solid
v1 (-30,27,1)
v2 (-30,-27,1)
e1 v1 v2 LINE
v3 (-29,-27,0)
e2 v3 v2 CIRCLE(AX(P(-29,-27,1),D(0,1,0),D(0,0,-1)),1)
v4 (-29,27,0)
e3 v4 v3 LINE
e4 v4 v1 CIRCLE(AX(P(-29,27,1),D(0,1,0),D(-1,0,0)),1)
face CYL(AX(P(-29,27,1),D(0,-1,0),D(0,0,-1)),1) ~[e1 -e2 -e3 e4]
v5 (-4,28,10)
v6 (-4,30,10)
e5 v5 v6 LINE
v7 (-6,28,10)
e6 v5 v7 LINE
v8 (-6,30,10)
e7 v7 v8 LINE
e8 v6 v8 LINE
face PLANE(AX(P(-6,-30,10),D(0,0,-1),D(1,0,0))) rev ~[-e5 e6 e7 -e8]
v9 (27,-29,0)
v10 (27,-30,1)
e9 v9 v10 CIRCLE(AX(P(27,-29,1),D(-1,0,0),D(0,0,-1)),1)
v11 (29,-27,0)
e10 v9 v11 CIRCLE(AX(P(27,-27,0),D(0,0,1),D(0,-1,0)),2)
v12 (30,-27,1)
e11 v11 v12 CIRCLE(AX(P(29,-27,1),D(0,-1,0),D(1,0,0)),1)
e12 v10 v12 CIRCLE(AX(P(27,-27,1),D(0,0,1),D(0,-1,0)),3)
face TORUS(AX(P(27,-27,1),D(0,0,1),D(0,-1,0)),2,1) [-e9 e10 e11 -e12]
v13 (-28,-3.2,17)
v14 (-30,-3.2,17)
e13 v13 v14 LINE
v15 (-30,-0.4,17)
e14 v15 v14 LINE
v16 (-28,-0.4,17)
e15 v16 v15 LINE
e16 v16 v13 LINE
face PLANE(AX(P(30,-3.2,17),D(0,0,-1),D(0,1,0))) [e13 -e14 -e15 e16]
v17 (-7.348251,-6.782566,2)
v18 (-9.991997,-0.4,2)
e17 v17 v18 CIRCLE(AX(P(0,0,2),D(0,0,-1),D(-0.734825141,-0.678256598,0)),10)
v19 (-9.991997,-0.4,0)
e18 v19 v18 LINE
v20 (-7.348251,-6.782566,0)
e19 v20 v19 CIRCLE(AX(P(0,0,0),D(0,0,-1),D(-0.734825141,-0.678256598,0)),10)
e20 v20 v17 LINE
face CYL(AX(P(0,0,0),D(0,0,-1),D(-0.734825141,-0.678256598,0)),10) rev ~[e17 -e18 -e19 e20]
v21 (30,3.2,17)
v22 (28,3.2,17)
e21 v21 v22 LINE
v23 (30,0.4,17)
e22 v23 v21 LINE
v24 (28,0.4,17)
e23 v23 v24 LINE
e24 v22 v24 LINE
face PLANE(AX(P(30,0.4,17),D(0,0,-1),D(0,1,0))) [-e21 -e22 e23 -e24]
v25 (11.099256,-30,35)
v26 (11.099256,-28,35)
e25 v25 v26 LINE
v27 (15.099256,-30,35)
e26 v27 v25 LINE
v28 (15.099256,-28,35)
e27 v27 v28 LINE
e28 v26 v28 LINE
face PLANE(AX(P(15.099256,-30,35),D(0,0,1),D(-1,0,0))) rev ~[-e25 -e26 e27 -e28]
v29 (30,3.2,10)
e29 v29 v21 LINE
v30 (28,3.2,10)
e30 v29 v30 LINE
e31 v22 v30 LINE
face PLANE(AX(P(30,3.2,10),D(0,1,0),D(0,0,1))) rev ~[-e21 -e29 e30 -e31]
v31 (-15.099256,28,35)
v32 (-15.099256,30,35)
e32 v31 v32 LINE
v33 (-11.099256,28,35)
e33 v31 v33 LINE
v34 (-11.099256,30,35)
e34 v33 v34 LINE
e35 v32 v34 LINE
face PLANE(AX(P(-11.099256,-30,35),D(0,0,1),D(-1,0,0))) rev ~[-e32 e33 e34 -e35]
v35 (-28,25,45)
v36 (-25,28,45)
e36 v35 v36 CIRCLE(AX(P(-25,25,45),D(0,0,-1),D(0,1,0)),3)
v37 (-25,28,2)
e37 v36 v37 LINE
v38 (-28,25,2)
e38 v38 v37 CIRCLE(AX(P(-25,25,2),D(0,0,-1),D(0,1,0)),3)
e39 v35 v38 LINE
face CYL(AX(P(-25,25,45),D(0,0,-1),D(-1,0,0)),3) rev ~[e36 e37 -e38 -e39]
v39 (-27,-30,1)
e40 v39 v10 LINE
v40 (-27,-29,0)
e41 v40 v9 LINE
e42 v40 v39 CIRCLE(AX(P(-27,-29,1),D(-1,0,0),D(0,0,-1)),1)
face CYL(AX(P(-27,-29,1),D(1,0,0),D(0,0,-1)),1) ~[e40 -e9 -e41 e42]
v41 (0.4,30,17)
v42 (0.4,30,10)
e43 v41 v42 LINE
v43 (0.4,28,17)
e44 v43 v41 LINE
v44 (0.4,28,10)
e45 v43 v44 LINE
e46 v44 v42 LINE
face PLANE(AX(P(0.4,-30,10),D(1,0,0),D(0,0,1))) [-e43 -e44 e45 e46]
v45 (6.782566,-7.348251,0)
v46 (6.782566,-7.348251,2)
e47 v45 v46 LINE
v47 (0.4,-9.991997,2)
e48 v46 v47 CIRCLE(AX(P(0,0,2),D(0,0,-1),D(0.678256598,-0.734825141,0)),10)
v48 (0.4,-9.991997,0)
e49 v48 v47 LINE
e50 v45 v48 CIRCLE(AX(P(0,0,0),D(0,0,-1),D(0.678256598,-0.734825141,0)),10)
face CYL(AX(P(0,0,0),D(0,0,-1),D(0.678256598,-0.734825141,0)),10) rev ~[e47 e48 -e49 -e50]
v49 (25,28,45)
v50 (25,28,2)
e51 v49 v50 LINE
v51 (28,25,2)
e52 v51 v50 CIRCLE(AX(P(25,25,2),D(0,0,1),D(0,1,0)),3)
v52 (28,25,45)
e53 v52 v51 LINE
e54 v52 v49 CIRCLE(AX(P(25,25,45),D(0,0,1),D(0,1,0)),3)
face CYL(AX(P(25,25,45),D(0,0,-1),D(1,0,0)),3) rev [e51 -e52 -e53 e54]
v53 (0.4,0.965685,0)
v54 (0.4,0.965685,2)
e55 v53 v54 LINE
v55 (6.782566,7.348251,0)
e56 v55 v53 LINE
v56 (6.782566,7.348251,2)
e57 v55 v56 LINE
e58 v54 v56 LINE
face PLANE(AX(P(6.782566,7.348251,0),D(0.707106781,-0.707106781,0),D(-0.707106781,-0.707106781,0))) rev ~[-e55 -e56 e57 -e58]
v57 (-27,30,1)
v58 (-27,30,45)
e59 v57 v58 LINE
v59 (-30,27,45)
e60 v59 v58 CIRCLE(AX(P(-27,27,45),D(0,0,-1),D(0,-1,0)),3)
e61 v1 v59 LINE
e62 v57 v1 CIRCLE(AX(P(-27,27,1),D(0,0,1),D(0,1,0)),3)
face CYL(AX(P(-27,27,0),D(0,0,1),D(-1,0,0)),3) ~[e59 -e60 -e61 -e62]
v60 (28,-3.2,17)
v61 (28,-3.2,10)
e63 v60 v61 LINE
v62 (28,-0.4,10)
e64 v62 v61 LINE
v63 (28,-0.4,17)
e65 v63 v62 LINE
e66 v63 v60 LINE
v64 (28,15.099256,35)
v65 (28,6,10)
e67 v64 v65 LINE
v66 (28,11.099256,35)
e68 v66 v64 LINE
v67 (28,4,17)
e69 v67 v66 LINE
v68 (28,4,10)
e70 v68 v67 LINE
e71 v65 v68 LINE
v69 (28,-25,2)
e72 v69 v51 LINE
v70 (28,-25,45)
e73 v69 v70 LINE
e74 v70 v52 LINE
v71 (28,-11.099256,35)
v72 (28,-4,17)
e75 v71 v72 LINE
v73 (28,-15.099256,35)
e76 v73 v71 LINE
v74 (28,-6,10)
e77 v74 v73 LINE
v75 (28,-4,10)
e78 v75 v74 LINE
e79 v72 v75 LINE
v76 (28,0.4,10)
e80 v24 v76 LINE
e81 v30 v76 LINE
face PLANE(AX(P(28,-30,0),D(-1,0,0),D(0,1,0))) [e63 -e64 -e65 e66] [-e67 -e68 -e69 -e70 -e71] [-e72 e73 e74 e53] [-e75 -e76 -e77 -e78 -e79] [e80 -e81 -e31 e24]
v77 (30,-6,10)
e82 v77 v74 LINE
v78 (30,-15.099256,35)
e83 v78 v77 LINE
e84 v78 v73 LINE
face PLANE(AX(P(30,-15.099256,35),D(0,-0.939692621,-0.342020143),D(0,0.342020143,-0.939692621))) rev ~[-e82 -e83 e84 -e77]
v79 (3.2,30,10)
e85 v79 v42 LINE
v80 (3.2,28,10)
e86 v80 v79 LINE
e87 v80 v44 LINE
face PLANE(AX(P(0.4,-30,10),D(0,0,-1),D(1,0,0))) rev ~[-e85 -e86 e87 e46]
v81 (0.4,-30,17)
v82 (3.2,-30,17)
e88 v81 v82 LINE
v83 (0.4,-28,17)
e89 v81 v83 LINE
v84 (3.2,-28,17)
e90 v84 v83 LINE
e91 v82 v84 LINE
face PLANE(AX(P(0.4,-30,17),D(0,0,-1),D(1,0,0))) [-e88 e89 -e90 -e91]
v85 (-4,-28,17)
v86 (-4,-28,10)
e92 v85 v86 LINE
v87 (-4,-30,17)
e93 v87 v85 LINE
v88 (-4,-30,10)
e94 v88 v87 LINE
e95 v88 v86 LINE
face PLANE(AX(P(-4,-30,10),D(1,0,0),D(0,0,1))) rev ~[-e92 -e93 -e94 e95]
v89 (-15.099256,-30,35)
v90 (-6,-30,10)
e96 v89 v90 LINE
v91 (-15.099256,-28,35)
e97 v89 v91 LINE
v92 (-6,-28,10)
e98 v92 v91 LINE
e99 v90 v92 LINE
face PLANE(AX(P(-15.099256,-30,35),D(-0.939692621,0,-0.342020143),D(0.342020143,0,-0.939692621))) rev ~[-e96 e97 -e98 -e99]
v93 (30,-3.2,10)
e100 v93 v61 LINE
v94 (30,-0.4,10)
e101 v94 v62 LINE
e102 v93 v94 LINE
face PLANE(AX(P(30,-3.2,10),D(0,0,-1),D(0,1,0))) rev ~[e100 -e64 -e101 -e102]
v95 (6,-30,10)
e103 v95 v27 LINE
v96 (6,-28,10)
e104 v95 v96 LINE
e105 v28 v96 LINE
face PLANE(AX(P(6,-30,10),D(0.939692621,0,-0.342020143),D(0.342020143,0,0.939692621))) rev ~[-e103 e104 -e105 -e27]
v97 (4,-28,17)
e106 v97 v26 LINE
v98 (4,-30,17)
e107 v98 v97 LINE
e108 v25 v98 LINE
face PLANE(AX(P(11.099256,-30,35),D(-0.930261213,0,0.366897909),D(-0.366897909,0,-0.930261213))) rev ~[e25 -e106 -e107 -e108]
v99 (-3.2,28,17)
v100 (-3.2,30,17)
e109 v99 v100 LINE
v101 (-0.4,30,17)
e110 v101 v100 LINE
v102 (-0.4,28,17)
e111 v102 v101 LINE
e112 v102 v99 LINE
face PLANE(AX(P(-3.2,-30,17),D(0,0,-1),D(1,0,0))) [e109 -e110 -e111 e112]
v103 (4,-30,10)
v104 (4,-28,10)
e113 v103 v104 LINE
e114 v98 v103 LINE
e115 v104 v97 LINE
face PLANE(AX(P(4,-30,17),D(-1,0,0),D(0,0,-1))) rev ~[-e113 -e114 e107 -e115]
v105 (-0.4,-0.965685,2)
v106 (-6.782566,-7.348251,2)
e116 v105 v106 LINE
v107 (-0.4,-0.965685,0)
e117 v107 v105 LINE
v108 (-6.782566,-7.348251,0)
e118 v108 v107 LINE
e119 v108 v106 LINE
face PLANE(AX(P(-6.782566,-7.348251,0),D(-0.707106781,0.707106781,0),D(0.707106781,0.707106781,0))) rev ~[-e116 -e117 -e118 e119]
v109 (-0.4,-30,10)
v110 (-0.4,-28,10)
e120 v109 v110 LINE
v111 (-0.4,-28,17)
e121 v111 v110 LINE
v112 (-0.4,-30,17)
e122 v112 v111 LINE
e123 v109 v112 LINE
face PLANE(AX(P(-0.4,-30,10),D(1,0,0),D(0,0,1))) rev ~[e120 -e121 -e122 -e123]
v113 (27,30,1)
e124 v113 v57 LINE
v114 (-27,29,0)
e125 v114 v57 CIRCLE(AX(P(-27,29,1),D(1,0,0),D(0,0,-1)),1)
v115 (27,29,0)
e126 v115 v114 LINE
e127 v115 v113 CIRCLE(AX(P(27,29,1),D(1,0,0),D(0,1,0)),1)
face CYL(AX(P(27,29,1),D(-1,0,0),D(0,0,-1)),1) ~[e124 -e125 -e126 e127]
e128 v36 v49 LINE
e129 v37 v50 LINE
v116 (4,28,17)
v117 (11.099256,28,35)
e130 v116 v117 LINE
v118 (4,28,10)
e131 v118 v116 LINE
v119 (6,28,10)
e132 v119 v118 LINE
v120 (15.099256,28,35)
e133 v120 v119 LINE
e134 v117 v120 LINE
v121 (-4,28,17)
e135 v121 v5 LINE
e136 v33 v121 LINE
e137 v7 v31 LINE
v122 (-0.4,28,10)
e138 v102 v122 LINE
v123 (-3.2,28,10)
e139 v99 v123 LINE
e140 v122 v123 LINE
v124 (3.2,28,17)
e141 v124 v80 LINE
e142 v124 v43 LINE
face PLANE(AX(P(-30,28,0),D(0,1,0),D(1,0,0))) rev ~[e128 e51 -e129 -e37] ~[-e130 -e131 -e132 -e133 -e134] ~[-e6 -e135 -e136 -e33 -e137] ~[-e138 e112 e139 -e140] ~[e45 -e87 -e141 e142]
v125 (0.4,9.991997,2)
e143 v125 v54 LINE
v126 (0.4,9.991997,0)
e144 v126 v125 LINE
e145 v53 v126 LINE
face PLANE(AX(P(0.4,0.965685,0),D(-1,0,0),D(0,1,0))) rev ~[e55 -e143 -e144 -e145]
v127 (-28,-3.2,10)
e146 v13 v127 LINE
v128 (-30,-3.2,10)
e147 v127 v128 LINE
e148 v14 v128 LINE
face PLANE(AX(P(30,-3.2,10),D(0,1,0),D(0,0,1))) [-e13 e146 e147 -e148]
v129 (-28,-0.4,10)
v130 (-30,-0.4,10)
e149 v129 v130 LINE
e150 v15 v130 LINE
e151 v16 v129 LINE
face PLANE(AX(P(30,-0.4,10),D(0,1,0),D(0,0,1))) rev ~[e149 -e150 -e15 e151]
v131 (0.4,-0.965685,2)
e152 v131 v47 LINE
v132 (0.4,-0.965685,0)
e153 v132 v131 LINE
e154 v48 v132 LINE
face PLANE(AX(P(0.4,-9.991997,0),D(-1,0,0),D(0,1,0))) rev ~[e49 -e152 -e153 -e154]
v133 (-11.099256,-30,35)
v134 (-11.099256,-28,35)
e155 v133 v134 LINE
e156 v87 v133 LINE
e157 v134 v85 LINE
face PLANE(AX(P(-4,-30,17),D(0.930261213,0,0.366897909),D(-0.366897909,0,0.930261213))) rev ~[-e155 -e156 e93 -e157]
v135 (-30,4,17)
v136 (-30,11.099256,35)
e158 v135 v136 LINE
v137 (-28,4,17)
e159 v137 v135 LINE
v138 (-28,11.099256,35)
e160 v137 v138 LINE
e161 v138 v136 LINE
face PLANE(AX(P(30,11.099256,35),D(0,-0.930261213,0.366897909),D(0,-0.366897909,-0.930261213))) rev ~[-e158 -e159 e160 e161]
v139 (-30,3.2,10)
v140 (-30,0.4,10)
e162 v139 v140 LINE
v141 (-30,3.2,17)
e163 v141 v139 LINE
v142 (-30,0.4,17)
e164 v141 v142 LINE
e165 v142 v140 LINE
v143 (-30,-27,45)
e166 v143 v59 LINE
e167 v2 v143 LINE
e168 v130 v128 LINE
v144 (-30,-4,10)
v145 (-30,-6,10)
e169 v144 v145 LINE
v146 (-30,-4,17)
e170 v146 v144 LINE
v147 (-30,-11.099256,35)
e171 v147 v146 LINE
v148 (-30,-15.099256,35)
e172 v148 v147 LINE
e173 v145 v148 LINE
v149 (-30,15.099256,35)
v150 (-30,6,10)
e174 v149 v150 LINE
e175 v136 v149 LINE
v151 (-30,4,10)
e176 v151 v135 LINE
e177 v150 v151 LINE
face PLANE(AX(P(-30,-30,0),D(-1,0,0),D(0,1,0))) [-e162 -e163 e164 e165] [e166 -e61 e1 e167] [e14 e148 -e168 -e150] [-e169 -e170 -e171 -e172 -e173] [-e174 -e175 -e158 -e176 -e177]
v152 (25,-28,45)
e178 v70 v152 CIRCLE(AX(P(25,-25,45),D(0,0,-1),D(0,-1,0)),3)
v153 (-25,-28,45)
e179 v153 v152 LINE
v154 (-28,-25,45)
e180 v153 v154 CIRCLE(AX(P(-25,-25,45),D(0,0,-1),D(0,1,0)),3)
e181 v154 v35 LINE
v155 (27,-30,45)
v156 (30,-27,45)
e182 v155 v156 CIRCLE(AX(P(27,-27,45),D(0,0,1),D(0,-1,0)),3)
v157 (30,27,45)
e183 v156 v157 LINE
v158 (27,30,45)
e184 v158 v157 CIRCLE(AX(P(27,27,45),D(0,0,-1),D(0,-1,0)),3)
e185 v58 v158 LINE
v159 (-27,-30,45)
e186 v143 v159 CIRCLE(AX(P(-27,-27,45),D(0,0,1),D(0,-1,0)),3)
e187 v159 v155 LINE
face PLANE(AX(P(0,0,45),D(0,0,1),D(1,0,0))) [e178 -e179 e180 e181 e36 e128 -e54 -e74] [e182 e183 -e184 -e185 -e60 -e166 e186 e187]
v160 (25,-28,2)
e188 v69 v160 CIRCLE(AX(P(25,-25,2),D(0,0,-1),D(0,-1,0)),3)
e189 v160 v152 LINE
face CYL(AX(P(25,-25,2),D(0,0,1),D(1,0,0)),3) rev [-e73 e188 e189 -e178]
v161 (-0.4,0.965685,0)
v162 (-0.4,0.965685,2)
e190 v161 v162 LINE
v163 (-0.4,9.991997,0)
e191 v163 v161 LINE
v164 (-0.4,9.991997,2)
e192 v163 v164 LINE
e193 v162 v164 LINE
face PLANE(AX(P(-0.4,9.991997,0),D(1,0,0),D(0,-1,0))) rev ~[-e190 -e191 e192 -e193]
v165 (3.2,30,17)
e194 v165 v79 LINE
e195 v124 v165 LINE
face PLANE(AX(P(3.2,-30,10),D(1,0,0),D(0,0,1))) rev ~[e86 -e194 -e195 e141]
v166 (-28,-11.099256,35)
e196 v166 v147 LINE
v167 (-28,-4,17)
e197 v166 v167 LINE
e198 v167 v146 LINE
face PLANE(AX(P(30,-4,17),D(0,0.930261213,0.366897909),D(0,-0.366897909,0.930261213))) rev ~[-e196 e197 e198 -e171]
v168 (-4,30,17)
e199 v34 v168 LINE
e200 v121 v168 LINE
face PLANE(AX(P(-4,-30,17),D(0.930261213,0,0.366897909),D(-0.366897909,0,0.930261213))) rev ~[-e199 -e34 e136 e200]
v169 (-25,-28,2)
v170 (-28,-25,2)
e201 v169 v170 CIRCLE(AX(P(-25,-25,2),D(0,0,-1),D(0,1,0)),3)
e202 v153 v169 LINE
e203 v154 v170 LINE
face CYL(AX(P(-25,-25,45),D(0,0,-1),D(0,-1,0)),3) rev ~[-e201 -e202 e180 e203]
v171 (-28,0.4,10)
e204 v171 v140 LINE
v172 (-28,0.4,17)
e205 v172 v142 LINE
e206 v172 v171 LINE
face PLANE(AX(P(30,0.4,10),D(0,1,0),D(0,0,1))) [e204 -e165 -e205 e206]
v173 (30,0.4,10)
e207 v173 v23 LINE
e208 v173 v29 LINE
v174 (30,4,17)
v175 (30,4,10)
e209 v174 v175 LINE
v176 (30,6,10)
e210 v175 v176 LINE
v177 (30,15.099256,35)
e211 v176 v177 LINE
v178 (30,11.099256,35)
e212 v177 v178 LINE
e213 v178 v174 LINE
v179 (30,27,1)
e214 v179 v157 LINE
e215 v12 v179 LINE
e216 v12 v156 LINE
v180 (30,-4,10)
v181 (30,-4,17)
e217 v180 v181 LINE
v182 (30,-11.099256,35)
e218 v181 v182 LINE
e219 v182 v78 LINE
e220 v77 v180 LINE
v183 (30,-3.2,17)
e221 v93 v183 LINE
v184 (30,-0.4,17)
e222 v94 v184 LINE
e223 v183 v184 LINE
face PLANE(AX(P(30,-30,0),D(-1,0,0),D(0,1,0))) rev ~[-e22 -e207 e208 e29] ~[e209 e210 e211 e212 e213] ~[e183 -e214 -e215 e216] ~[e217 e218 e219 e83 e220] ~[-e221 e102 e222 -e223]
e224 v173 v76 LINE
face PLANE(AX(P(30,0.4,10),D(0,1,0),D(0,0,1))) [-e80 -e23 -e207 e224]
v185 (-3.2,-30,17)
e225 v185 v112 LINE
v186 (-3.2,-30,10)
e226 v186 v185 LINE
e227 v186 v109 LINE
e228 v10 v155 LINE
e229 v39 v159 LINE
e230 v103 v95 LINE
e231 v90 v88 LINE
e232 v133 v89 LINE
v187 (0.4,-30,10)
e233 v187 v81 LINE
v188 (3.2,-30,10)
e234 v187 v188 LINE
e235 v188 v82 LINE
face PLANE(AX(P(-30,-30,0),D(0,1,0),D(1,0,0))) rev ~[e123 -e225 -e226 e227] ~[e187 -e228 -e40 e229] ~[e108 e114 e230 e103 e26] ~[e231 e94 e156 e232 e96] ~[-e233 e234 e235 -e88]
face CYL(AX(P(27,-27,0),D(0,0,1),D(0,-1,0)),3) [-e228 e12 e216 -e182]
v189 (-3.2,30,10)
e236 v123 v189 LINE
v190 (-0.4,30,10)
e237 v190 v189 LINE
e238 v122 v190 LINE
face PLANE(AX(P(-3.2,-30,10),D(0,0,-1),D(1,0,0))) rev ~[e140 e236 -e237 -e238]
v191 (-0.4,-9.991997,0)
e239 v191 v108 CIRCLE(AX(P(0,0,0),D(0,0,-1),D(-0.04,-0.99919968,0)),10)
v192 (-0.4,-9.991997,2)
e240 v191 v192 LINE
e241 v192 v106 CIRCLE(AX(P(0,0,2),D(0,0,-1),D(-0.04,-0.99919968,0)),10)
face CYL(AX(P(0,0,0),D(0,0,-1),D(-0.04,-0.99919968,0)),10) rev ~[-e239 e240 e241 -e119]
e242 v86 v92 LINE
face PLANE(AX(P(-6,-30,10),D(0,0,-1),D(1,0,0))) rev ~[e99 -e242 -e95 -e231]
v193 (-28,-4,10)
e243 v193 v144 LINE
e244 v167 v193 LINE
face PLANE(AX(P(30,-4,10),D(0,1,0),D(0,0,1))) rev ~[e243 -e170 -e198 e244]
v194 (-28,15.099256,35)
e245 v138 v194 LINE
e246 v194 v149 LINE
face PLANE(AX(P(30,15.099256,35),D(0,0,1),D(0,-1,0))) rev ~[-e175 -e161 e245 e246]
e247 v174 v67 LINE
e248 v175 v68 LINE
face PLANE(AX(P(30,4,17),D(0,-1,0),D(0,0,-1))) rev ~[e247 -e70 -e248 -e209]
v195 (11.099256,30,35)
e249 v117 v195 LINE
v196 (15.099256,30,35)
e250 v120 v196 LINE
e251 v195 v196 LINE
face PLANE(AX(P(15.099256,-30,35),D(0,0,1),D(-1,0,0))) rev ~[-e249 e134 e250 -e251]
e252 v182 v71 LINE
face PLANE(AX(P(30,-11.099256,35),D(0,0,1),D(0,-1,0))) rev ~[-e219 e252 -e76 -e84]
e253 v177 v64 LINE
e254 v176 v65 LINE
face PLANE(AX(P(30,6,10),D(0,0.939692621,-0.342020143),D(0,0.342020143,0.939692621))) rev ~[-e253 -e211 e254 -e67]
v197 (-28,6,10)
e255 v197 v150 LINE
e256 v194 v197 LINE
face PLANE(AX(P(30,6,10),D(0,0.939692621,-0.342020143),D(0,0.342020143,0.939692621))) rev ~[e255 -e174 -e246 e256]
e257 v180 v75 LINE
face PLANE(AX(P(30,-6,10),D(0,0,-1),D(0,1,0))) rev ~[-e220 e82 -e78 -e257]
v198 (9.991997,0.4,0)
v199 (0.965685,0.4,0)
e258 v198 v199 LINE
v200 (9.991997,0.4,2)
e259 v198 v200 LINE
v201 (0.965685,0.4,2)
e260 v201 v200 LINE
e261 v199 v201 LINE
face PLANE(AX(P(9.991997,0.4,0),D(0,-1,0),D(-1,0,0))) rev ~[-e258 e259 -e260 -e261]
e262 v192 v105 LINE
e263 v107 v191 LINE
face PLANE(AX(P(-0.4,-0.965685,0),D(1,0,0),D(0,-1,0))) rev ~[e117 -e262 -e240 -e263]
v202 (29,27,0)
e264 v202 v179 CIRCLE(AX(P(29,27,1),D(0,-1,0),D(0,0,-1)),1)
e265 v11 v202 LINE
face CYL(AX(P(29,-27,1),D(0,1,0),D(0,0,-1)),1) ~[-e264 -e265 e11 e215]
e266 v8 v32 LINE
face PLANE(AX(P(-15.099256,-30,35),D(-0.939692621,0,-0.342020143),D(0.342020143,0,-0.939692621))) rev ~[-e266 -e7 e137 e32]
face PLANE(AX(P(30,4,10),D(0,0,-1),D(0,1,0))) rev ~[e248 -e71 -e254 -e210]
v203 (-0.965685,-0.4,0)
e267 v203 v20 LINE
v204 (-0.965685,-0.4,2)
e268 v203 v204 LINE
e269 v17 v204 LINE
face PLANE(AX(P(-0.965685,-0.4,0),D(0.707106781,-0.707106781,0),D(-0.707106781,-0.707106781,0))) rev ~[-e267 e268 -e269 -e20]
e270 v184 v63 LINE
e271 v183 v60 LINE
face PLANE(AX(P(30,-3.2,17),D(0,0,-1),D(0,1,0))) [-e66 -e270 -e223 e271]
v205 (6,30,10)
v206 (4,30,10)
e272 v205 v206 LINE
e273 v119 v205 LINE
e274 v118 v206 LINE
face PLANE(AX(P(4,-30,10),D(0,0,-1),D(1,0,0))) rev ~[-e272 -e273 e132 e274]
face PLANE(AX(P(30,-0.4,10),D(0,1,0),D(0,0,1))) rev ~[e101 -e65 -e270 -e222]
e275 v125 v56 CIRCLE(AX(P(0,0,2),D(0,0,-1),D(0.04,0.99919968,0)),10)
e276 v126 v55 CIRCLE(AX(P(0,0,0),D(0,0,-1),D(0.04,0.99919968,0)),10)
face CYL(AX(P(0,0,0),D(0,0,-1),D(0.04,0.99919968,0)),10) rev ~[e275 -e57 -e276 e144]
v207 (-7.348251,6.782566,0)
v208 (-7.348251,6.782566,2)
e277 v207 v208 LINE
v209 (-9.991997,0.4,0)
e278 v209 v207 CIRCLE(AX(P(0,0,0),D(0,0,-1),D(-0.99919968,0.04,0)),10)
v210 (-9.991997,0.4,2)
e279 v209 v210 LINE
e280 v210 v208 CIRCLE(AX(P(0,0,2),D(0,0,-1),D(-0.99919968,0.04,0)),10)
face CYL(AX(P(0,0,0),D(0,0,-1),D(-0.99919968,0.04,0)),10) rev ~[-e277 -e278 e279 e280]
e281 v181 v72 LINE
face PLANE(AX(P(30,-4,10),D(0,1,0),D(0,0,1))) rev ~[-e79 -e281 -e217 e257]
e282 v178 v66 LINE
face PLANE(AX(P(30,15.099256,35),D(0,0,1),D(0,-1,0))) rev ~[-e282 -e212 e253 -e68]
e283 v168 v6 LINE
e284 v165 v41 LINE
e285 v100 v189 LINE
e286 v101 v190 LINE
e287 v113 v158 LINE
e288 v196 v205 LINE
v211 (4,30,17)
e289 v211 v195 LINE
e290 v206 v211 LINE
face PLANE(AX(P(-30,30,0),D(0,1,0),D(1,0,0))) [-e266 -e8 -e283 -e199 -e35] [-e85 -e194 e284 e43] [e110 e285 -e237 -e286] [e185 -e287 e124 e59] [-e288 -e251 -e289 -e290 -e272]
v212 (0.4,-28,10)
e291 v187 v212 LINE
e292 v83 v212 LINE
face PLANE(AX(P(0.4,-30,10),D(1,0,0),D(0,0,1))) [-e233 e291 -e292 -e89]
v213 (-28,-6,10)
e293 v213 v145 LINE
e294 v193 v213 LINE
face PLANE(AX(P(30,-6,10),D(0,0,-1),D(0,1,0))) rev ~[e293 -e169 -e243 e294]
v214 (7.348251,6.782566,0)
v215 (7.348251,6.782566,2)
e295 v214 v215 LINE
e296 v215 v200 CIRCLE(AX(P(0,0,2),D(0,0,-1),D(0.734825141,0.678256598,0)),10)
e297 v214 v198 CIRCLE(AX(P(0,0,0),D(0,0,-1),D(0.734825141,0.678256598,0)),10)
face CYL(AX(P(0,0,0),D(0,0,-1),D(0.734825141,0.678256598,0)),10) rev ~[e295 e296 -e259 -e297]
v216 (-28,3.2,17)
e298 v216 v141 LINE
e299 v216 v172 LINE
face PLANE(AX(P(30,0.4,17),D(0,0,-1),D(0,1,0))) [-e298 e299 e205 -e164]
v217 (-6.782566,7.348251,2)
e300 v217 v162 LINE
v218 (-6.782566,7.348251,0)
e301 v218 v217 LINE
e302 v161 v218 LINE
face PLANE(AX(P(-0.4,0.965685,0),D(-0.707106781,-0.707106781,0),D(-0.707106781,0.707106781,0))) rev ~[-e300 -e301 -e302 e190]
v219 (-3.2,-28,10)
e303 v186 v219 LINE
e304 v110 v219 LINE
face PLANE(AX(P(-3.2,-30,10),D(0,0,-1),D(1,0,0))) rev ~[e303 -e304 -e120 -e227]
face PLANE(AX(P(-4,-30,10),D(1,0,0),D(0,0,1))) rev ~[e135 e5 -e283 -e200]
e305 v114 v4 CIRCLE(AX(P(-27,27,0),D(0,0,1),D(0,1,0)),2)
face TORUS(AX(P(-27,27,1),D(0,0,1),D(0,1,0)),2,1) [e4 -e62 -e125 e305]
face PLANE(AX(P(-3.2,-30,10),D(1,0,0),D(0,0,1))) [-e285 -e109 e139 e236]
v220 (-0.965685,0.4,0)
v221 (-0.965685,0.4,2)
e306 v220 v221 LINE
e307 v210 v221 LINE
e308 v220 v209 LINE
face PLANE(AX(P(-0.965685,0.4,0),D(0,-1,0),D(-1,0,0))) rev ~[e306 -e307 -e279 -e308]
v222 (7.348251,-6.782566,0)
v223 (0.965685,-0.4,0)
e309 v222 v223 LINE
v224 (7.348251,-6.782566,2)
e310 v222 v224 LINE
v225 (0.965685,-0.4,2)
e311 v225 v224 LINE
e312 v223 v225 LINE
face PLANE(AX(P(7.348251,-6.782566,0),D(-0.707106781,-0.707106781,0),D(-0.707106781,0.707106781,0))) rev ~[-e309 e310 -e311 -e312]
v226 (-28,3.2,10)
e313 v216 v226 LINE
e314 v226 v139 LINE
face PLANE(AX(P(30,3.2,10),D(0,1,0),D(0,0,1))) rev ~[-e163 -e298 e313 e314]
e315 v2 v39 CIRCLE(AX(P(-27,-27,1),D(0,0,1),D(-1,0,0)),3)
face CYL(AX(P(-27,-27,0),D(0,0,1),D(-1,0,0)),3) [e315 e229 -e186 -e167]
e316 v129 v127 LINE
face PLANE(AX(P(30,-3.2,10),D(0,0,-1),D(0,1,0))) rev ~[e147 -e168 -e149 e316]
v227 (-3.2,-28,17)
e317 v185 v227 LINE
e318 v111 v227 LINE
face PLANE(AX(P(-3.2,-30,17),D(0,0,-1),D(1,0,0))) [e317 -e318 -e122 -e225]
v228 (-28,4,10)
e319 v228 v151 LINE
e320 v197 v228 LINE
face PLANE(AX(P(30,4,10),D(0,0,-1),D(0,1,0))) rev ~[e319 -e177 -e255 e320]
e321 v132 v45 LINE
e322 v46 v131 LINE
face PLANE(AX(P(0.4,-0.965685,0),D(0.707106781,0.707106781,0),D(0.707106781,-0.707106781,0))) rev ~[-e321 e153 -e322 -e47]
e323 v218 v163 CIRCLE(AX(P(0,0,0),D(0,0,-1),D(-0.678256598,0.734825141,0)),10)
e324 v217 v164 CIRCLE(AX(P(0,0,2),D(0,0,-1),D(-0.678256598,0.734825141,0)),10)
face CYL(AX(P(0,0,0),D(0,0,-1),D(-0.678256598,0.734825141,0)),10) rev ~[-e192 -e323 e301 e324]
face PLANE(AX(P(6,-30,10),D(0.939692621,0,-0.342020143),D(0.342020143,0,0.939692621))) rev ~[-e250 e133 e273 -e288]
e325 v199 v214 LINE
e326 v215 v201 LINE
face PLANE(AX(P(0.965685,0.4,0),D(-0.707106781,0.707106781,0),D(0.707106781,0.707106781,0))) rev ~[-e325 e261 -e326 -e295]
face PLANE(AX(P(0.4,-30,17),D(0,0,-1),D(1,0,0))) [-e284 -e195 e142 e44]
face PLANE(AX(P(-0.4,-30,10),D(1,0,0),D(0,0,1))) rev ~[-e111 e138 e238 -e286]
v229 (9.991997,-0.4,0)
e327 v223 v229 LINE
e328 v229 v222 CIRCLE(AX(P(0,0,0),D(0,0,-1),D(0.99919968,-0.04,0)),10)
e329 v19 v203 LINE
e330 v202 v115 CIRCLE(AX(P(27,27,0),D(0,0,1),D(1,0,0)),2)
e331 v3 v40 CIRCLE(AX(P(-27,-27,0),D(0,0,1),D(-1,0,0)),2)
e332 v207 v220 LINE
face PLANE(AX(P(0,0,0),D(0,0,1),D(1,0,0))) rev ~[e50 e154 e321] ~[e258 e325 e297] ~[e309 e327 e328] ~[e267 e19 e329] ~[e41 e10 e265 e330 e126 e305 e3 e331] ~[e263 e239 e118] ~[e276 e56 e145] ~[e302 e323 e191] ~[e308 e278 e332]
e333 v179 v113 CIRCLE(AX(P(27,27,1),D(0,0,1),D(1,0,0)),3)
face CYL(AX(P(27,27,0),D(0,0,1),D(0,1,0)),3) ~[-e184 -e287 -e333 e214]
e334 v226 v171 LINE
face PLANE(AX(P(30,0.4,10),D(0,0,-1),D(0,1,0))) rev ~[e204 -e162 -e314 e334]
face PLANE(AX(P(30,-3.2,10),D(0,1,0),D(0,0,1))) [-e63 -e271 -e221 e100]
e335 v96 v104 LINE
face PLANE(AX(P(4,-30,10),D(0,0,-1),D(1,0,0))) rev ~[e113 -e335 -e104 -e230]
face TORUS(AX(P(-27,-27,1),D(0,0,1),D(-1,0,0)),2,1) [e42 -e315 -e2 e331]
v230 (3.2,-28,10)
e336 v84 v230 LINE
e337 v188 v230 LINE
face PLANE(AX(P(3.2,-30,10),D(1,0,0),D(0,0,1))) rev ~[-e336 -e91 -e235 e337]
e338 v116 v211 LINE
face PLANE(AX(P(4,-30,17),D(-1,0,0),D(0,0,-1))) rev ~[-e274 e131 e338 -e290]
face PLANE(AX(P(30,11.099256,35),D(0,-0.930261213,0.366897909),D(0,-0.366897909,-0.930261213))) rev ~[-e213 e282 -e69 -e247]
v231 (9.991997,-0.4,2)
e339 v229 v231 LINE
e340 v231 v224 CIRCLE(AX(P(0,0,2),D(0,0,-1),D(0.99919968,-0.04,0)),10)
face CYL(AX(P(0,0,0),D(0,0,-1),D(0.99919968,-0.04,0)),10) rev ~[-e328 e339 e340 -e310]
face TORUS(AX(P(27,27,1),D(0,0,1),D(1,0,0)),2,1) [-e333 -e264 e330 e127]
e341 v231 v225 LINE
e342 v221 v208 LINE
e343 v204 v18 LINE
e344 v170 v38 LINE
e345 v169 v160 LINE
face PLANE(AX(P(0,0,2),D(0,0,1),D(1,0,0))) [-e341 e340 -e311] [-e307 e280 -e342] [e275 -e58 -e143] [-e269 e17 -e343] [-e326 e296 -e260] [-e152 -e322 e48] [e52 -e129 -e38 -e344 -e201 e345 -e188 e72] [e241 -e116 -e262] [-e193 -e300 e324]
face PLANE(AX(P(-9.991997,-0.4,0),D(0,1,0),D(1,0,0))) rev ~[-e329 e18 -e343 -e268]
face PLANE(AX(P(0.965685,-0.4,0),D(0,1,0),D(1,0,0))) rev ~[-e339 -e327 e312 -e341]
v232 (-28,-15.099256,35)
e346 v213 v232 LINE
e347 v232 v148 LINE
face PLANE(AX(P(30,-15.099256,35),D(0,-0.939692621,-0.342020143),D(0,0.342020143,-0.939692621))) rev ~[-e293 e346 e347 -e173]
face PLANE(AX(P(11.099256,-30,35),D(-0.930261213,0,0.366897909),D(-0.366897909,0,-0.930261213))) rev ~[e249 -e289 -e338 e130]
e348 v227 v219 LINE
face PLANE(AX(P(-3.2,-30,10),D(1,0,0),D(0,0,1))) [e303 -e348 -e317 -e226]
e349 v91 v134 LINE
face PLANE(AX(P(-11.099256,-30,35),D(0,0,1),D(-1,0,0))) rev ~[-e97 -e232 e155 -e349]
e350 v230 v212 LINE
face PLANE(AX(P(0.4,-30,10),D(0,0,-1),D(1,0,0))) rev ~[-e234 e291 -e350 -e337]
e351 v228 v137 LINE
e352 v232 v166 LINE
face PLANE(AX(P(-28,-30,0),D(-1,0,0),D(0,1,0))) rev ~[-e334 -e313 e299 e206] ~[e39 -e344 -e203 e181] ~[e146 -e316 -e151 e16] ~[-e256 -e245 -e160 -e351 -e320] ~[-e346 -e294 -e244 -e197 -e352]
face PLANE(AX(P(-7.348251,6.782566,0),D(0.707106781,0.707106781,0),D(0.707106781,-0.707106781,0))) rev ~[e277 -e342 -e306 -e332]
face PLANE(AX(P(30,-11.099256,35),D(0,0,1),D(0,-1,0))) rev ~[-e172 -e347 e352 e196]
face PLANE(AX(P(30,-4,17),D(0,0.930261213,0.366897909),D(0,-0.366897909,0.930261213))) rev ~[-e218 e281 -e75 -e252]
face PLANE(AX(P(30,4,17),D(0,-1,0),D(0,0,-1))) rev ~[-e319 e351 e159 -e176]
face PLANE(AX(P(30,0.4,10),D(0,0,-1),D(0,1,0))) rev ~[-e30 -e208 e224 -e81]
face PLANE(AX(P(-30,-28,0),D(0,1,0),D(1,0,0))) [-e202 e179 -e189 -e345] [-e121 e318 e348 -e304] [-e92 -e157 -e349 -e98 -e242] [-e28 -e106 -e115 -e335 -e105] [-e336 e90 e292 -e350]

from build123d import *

# Parameters (mm, degrees)
F0_W     = 60
F0_H     = 60
F1_DEPTH = 45
F2_T     = -2
F3_W     = 2.8
F3_H     = 7
F4_DEPTH = 64.2
F5_W     = 2.8
F5_H     = 7
F6_DEPTH = 63.5
F8_DEPTH = 25
F9_R     = 3
F10_R    = 1


# Not quite as in the source:
# - a feature names something its author has since deleted; it is built from what else it names


with BuildPart() as f1:
    # F0 (on Top) → F1 (new body)
    with BuildSketch(Plane.XY):
        Rectangle(F0_W, F0_H)
    extrude(amount=F1_DEPTH)

    # F2
    f2_openings = [f1.faces().sort_by_distance(p)[0] for p in [
        (0, 0, 45),
    ]]
    offset(amount=F2_T, openings=f2_openings)

    # F3 (on face) → F4 (cut)
    with BuildSketch(Plane.XZ.offset(30)):
        Polygon((-15.0992558567, 35), (-6, 10), (-4, 10), (-4, 17), (-11.0992558567, 35), align=None)
        with Locations((-1.8, 13.5)):
            Rectangle(F3_W, F3_H)
        with Locations((1.8, 13.5)):
            Rectangle(F3_W, F3_H)
        Polygon((4, 17), (4, 10), (6, 10), (15.0992558567, 35), (11.0992558567, 35), align=None)
    extrude(amount=-F4_DEPTH, mode=Mode.SUBTRACT)

    # F5 (on face) → F6 (cut)
    with BuildSketch(Plane.YZ.offset(30)):
        Polygon((-15.0992558567, 35), (-6, 10), (-4, 10), (-4, 17), (-11.0992558567, 35), align=None)
        with Locations((-1.8, 13.5)):
            Rectangle(F5_W, F5_H)
        with Locations((1.8, 13.5)):
            Rectangle(F5_W, F5_H)
        Polygon((4, 17), (4, 10), (6, 10), (15.0992558567, 35), (11.0992558567, 35), align=None)
    extrude(amount=-F6_DEPTH, mode=Mode.SUBTRACT)

    # F7 (on face) → F8 (cut)
    with BuildSketch(Plane(origin=(0, 0, 0), x_dir=(1, 0, 0), z_dir=(0, 0, -1))):
        with BuildLine():
            Line((0.9656854249, 0.4), (9.9919967974, 0.4))
            ThreePointArc((9.9919967974, 0.4), (9.2387953251, 3.8268343237), (7.3482514055, 6.7825659806))
            Line((7.3482514055, 6.7825659806), (0.9656854249, 0.4))
        make_face()
        with BuildLine():
            ThreePointArc((7.3482514055, -6.7825659806), (9.2387953251, -3.8268343237), (9.9919967974, -0.4))
            Line((9.9919967974, -0.4), (0.9656854249, -0.4))
            Line((0.9656854249, -0.4), (7.3482514055, -6.7825659806))
        make_face()
        with BuildLine():
            Line((0.4, 0.9656854249), (6.7825659806, 7.3482514055))
            ThreePointArc((6.7825659806, 7.3482514055), (3.8268343237, 9.2387953251), (0.4, 9.9919967974))
            Line((0.4, 9.9919967974), (0.4, 0.9656854249))
        make_face()
        with BuildLine():
            ThreePointArc((0.4, -9.9919967974), (3.8268343237, -9.2387953251), (6.7825659806, -7.3482514055))
            Line((6.7825659806, -7.3482514055), (0.4, -0.9656854249))
            Line((0.4, -0.9656854249), (0.4, -9.9919967974))
        make_face()
        with BuildLine():
            Line((-6.7825659806, 7.3482514055), (-0.4, 0.9656854249))
            Line((-0.4, 0.9656854249), (-0.4, 9.9919967974))
            ThreePointArc((-0.4, 9.9919967974), (-3.8268343237, 9.2387953251), (-6.7825659806, 7.3482514055))
        make_face()
        with BuildLine():
            Line((-0.4, -9.9919967974), (-0.4, -0.9656854249))
            Line((-0.4, -0.9656854249), (-6.7825659806, -7.3482514055))
            ThreePointArc((-6.7825659806, -7.3482514055), (-3.8268343237, -9.2387953251), (-0.4, -9.9919967974))
        make_face()
        with BuildLine():
            Line((-7.3482514055, -6.7825659806), (-0.9656854249, -0.4))
            Line((-0.9656854249, -0.4), (-9.9919967974, -0.4))
            ThreePointArc((-9.9919967974, -0.4), (-9.2387953251, -3.8268343237), (-7.3482514055, -6.7825659806))
        make_face()
        with BuildLine():
            Line((-9.9919967974, 0.4), (-0.9656854249, 0.4))
            Line((-0.9656854249, 0.4), (-7.3482514055, 6.7825659806))
            ThreePointArc((-7.3482514055, 6.7825659806), (-9.2387953251, 3.8268343237), (-9.9919967974, 0.4))
        make_face()
    extrude(amount=-F8_DEPTH, mode=Mode.SUBTRACT)

    # F9
    f9_edges = [f1.edges().sort_by_distance(p)[0] for p in [
        (-30, -30, 22.5),
        (30, -30, 22.5),
        (30, 30, 22.5),
        (-30, 30, 22.5),
        (-28, -28, 23.5),
        (28, -28, 23.5),
        (28, 28, 23.5),
        (-28, 28, 23.5),
    ]]
    fillet(f9_edges, radius=F9_R)

    # F10
    f10_edges = [f1.edges().sort_by_distance(p)[0] for p in [
        (0, -30, 0),
        (-30, 0, 0),
        (30, 0, 0),
        (0, 30, 0),
        (29.12132, 29.12132, 0),
        (-29.12132, 29.12132, 0),
        (29.12132, -29.12132, 0),
        (-29.12132, -29.12132, 0),
    ]]
    fillet(f10_edges, radius=F10_R)


solid = f1.part
